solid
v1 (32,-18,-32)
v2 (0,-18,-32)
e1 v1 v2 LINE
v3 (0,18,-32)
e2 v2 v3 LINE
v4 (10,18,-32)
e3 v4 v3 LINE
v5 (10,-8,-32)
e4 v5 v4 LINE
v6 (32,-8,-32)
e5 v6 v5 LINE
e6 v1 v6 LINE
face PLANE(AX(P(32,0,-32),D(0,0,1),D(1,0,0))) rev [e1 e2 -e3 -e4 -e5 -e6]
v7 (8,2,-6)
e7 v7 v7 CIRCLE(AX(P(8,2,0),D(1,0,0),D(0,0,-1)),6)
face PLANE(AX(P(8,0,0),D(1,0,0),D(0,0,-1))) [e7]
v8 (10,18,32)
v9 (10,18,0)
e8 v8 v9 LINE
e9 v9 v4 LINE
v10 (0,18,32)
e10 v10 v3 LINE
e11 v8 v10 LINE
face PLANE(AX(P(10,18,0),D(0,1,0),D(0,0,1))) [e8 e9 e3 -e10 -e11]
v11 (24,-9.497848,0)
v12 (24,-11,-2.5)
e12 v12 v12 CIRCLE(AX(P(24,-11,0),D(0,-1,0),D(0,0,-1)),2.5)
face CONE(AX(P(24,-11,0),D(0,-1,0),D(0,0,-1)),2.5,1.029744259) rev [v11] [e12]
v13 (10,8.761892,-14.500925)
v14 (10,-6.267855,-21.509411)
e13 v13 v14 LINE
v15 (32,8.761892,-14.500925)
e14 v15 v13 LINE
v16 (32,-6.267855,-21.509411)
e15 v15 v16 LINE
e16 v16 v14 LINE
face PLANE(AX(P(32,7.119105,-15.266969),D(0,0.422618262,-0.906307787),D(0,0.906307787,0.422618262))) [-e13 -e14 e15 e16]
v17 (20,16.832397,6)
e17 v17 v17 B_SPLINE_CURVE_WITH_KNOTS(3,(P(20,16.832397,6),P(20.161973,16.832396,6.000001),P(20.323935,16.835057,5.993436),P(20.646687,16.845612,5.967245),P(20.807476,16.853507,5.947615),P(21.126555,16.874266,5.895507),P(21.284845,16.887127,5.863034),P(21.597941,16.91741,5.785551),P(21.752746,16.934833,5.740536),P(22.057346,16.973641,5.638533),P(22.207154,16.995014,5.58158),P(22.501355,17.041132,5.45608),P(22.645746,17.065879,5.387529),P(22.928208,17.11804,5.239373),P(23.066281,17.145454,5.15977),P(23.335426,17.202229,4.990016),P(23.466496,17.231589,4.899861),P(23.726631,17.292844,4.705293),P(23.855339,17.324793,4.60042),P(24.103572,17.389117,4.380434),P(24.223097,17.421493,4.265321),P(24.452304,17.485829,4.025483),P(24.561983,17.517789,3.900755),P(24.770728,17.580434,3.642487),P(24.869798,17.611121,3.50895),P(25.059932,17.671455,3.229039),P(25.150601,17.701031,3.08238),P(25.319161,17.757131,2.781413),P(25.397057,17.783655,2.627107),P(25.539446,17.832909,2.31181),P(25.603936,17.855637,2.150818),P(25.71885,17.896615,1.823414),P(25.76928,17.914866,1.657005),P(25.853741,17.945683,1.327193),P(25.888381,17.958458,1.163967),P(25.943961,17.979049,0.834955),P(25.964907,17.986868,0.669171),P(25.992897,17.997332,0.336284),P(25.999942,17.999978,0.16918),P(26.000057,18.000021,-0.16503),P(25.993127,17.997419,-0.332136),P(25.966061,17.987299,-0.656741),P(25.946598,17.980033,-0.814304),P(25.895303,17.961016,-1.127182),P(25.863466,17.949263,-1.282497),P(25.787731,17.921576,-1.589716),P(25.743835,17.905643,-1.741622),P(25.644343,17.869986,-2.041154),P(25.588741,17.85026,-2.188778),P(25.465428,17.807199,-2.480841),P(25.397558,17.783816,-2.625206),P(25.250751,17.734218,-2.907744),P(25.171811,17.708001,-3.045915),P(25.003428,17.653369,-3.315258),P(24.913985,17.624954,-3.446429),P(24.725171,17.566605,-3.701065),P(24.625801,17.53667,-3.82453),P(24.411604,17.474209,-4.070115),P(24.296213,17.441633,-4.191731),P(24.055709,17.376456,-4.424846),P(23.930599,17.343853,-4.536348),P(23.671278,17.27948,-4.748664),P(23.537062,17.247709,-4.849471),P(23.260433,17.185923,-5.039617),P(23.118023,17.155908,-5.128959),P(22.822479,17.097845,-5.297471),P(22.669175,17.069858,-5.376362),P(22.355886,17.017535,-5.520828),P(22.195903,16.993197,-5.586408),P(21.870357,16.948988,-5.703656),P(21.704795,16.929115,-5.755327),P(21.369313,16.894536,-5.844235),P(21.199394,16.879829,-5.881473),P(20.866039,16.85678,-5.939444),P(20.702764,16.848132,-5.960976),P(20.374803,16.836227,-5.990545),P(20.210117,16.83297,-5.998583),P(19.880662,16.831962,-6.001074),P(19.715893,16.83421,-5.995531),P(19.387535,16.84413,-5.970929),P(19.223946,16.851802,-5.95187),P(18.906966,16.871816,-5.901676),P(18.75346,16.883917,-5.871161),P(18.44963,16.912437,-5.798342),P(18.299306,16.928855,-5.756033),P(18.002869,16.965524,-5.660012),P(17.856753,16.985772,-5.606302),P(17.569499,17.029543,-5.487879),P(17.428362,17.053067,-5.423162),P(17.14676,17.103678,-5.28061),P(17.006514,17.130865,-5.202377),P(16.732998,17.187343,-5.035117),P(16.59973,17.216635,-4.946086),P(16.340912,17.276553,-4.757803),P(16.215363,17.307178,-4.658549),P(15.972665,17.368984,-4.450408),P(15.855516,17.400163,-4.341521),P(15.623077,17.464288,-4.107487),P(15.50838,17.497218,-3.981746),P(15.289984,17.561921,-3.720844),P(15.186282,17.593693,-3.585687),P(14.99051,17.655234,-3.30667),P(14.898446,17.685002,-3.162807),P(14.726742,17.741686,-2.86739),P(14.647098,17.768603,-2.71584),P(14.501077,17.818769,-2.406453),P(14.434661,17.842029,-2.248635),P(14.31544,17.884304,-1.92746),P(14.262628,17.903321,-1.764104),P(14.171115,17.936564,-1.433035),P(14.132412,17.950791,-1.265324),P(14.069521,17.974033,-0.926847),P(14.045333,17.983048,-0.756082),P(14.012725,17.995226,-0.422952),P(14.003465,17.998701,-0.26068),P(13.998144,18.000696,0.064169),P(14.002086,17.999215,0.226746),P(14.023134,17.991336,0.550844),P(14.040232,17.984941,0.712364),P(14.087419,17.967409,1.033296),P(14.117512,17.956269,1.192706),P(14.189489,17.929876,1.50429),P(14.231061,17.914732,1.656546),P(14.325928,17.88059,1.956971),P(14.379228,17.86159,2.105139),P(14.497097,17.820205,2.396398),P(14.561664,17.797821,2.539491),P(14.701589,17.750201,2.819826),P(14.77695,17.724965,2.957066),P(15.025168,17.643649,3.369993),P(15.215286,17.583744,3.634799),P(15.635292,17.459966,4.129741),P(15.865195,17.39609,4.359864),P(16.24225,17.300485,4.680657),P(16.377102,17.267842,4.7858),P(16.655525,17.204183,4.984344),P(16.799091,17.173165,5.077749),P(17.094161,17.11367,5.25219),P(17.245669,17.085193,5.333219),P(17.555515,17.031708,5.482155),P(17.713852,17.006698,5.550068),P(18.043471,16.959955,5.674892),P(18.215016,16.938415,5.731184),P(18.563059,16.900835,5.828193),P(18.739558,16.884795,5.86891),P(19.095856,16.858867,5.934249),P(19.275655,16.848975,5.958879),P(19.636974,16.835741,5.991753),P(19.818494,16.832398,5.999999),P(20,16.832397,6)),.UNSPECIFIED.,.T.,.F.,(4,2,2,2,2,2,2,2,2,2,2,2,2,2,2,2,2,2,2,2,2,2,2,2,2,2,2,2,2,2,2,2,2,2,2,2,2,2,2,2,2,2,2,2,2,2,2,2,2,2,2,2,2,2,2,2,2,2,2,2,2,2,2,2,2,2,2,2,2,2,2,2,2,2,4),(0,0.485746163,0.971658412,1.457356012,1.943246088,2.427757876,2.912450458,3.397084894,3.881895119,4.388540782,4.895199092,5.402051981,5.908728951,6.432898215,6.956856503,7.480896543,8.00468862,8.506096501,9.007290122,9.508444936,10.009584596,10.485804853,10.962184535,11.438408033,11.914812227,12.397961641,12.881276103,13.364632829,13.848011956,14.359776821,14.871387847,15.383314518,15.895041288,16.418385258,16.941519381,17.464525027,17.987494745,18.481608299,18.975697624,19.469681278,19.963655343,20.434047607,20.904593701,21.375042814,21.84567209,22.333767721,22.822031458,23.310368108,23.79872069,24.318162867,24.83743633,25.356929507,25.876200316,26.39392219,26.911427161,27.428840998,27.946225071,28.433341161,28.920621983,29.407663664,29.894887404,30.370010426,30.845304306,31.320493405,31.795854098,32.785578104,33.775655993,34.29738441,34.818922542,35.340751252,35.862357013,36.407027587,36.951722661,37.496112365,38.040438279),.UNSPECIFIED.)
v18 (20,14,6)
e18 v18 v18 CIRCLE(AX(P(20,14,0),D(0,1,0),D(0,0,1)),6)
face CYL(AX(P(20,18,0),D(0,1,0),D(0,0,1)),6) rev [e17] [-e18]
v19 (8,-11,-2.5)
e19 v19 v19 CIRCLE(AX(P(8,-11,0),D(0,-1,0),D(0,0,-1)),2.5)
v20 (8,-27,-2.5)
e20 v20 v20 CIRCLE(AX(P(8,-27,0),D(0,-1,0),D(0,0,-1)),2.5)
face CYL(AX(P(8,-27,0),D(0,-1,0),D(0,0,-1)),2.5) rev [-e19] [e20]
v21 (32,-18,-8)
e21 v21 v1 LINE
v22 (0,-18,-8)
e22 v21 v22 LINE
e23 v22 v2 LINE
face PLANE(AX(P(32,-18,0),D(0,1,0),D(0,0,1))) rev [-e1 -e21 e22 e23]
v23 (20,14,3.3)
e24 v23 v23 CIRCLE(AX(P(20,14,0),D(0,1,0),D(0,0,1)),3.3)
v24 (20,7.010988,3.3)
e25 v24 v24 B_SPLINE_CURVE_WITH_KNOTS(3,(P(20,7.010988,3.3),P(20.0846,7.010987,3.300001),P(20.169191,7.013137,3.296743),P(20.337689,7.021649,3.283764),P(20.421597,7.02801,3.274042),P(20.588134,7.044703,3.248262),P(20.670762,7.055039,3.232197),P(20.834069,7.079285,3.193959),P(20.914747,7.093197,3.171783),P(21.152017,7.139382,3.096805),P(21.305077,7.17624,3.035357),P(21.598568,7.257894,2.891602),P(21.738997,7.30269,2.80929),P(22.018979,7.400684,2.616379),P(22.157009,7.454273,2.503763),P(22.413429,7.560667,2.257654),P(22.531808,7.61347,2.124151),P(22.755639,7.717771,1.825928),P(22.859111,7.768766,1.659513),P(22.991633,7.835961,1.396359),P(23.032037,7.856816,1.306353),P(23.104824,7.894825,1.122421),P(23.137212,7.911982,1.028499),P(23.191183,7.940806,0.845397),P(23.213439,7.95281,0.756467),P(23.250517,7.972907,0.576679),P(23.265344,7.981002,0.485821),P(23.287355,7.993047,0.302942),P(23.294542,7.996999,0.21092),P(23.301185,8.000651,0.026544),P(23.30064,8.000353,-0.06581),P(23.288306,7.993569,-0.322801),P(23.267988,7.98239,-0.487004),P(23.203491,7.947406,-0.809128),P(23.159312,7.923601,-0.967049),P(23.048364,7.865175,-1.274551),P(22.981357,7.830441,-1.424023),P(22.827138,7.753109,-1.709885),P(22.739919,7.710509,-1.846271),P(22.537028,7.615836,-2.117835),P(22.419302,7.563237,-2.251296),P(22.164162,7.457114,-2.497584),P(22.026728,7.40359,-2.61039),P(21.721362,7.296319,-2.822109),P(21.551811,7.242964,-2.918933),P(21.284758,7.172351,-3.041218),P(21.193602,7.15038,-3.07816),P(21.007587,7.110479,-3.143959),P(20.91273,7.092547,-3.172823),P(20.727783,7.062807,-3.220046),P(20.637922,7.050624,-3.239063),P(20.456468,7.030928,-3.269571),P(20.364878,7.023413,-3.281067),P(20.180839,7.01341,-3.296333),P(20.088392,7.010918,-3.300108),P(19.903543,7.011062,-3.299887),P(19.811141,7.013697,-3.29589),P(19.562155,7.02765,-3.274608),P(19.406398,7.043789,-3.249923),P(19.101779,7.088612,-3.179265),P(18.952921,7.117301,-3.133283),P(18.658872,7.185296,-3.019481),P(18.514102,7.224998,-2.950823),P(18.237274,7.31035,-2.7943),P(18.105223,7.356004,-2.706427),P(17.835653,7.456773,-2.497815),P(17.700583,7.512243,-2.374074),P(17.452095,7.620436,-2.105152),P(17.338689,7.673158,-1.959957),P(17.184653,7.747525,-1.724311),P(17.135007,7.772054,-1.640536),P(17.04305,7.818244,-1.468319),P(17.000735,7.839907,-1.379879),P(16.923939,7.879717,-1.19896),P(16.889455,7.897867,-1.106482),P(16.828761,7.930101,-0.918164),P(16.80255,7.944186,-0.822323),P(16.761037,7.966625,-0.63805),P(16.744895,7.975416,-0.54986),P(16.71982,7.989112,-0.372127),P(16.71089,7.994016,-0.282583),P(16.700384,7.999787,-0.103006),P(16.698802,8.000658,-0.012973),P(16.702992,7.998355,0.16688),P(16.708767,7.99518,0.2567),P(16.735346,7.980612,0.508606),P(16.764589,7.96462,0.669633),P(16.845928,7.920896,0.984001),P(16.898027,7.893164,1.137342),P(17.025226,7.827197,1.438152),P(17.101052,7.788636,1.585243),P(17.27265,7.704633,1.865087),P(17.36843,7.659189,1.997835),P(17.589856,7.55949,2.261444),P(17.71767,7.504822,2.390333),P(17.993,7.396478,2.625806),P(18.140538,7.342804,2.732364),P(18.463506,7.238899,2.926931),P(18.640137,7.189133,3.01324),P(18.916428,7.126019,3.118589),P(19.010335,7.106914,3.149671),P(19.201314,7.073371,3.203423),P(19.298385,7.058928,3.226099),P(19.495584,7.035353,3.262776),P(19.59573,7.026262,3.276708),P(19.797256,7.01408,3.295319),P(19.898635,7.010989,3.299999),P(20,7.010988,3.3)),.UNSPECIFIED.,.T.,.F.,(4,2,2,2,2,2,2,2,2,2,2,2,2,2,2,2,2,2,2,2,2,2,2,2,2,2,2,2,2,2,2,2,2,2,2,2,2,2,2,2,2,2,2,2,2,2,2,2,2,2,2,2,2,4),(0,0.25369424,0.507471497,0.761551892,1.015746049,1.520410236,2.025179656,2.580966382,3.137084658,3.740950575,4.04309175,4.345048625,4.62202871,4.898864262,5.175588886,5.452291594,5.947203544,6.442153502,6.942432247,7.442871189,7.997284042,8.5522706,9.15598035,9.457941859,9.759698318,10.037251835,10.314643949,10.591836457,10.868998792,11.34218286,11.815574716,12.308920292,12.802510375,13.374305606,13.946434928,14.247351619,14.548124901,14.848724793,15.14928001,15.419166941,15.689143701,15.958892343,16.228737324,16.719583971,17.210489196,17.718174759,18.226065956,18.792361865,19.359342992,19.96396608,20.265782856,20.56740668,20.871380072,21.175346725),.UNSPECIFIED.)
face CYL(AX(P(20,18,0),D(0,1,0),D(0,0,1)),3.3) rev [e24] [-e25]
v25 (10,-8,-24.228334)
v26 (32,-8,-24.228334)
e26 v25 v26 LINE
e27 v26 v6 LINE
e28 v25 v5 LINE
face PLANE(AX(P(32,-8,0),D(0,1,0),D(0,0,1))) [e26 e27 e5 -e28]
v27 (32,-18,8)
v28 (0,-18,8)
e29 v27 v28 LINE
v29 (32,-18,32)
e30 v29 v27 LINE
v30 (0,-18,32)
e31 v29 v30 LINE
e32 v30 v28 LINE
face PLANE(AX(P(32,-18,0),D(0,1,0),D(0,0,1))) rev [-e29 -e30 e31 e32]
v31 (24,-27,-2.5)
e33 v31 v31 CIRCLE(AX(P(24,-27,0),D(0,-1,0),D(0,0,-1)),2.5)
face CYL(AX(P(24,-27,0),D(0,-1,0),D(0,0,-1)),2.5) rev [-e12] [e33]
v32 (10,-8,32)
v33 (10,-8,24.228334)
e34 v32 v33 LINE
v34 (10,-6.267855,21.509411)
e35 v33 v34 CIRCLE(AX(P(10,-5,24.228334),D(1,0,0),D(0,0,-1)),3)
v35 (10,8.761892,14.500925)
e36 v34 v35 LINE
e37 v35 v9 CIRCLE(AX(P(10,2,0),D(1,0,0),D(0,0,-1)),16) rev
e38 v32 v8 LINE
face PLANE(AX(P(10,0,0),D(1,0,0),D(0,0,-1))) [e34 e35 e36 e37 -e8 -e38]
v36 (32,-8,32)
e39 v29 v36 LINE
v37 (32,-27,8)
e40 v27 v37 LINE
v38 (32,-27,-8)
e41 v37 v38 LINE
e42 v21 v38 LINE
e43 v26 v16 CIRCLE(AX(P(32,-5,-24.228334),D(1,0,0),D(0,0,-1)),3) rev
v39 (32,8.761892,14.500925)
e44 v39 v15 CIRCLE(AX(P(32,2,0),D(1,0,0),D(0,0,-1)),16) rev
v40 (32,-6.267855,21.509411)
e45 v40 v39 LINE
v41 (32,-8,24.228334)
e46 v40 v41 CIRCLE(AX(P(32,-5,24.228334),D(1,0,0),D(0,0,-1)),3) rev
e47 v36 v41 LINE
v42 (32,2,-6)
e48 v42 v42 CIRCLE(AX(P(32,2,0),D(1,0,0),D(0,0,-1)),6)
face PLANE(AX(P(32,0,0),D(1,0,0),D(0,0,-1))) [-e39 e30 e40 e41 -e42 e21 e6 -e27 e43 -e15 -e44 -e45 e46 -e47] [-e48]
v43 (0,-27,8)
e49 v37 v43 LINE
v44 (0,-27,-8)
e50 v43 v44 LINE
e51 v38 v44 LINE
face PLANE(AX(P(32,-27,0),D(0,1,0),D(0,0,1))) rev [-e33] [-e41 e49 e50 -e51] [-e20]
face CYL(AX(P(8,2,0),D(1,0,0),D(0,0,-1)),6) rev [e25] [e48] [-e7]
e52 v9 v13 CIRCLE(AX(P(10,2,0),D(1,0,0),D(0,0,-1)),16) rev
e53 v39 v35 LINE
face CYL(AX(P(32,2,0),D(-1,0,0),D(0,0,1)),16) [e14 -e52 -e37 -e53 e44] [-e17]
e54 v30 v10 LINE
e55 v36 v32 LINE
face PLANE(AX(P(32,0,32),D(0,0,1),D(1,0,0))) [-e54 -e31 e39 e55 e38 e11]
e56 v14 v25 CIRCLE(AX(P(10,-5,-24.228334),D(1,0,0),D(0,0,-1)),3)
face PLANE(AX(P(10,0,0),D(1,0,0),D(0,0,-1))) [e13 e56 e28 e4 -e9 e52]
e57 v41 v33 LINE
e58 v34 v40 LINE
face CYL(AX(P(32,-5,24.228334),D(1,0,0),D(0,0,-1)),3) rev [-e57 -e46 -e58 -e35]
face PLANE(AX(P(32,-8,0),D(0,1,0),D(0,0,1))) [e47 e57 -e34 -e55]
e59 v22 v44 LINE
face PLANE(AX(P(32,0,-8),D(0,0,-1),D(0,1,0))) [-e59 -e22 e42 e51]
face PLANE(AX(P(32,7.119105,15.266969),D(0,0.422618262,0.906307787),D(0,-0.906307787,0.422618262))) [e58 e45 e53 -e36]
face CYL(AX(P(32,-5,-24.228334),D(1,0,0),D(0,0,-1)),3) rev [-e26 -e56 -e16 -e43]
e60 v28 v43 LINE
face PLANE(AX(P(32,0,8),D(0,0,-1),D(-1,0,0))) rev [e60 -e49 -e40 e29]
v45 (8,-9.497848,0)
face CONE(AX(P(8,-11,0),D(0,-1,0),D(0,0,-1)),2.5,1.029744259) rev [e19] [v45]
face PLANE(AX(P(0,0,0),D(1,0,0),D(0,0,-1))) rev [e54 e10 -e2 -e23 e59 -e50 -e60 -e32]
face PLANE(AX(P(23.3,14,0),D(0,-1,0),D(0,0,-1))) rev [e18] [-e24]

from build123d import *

# Parameters (mm, degrees)
SKETCH1_W                               = 16
SKETCH1_H                               = 9
SKETCH1_R                               = 6
BOSS_EXTRUDE1_DEPTH                     = 32
BOSS_EXTRUDE2_DEPTH                     = 10
CUT_EXTRUDE1_START                      = 32
SKETCH1_4_R                             = 6
CUT_EXTRUDE1_DEPTH                      = 24
FILLET1_R                               = 3
CBORE_START                             = 14
CBORE_FOR_M6_HEX_HEAD_BOLT1_OUTLINE_R   = 6
CBORE_FOR_M6_HEX_HEAD_BOLT1_DEPTH       = 4
CBORE_START_2                           = 7.010987826
CBORE_FOR_M6_HEX_HEAD_BOLT1_2_OUTLINE_R = 3.3
CBORE_FOR_M6_HEX_HEAD_BOLT1_2_DEPTH     = 6.989012174
M6X1_0_TAPPED_HOLE1_D                   = 5
M6X1_0_TAPPED_HOLE1_DEPTH               = 16
M6X1_0_TAPPED_HOLE1_TIP                 = 1.502151548


# Read off the part's stored shape, not the designer's step: CBORE for M6 Hex Head Bolt1
with BuildPart() as part:
    # Sketch1 → Boss-Extrude1 (new body)
    # profile 1 of 4: a face of its own
    with BuildSketch(Plane(origin=(0, 0, 0), x_dir=(0, 0, -1), z_dir=(1, 0, 0))):
        Polygon((-22.317123285, -8), (-32, -8), (-32, -18), (-8, -18), (8, -18), (32, -18), (32, -8), (22.317123285, -8), align=None)
    # profile 2 of 4: a face of its own
    with BuildSketch(Plane(origin=(0, 0, 0), x_dir=(0, 0, -1), z_dir=(1, 0, 0))):
        with Locations((0, -22.5)):
            Rectangle(SKETCH1_W, SKETCH1_H)
    # profile 3 of 4: a face of its own
    with BuildSketch(Plane(origin=(0, 0, 0), x_dir=(0, 0, -1), z_dir=(1, 0, 0))):
        with BuildLine():
            Line((-14.500924593, 8.761892188), (-22.317123285, -8))
            Line((-22.317123285, -8), (22.317123285, -8))
            Line((22.317123285, -8), (14.500924593, 8.761892188))
            ThreePointArc((14.500924593, 8.761892188), (8.596793684, 15.494263165), (-1.18e-07, 18))
            ThreePointArc((-1.18e-07, 18), (-8.596793783, 15.494263101), (-14.500924593, 8.761892188))
        make_face()
        with Locations((0, 2)):
            Circle(SKETCH1_R, mode=Mode.SUBTRACT)
    # profile 4 of 4: a face of its own
    with BuildSketch(Plane(origin=(0, 0, 0), x_dir=(0, 0, -1), z_dir=(1, 0, 0))):
        with Locations((0, 2)):
            Circle(SKETCH1_R)
    extrude(amount=BOSS_EXTRUDE1_DEPTH)

    # Sketch1<3> → Boss-Extrude2 (add)
    with BuildSketch(Plane(origin=(0, 0, 0), x_dir=(0, 0, -1), z_dir=(1, 0, 0))):
        with BuildLine():
            Line((-32, 18), (-32, -8))
            Line((-32, -8), (-22.317123285, -8))
            Line((-22.317123285, -8), (-14.500924593, 8.761892188))
            ThreePointArc((-14.500924593, 8.761892188), (-8.596793783, 15.494263101), (-1.18e-07, 18))
            Line((-1.18e-07, 18), (-32, 18))
        make_face()
        with BuildLine():
            Line((14.500924593, 8.761892188), (22.317123285, -8))
            Line((22.317123285, -8), (32, -8))
            Line((32, -8), (32, 18))
            Line((32, 18), (-1.18e-07, 18))
            ThreePointArc((-1.18e-07, 18), (8.596793684, 15.494263165), (14.500924593, 8.761892188))
        make_face()
    extrude(amount=BOSS_EXTRUDE2_DEPTH)

    # Sketch1<4> → Cut-Extrude1 (cut)
    with BuildSketch(Plane(origin=(0, 0, 0), x_dir=(0, 0, -1), z_dir=(1, 0, 0)).offset(CUT_EXTRUDE1_START)):
        with Locations((0, 2)):
            Circle(SKETCH1_4_R)
    extrude(amount=-CUT_EXTRUDE1_DEPTH, mode=Mode.SUBTRACT)

    # Fillet1
    fillet1_edges = [part.edges().sort_by_distance(p)[0] for p in [
        (21, -8, 22.317123285),
        (21, -8, -22.317123285),
    ]]
    fillet(fillet1_edges, radius=FILLET1_R)

    # CBORE for M6 Hex Head Bolt1 outline → CBORE for M6 Hex Head Bolt1 (cut)
    with BuildSketch(Plane(origin=(0, 0, 0), x_dir=(1, 0, 0), z_dir=(0, 1, 0)).offset(CBORE_START)):
        with Locations((20, 0)):
            Circle(CBORE_FOR_M6_HEX_HEAD_BOLT1_OUTLINE_R)
    extrude(amount=CBORE_FOR_M6_HEX_HEAD_BOLT1_DEPTH, mode=Mode.SUBTRACT)

    # CBORE for M6 Hex Head Bolt1 2 outline → CBORE for M6 Hex Head Bolt1 2 (cut)
    with BuildSketch(Plane(origin=(0, 0, 0), x_dir=(1, 0, 0), z_dir=(0, 1, 0)).offset(CBORE_START_2)):
        with Locations((20, 0)):
            Circle(CBORE_FOR_M6_HEX_HEAD_BOLT1_2_OUTLINE_R)
    extrude(amount=CBORE_FOR_M6_HEX_HEAD_BOLT1_2_DEPTH, mode=Mode.SUBTRACT)

    # M6x1.0 Tapped Hole1
    with Locations(Plane(origin=(0, -27, 0), x_dir=(-1, 0, 0), z_dir=(0, -1, 0))):
        with Locations((-24, 0), (-8, 0)):
            Hole(M6X1_0_TAPPED_HOLE1_D / 2, depth=M6X1_0_TAPPED_HOLE1_DEPTH)
            with Locations((0, 0, -(M6X1_0_TAPPED_HOLE1_DEPTH + M6X1_0_TAPPED_HOLE1_TIP / 2))):  # 118° drill point
                Cone(0, M6X1_0_TAPPED_HOLE1_D / 2, M6X1_0_TAPPED_HOLE1_TIP, mode=Mode.SUBTRACT)


solid = part.part
